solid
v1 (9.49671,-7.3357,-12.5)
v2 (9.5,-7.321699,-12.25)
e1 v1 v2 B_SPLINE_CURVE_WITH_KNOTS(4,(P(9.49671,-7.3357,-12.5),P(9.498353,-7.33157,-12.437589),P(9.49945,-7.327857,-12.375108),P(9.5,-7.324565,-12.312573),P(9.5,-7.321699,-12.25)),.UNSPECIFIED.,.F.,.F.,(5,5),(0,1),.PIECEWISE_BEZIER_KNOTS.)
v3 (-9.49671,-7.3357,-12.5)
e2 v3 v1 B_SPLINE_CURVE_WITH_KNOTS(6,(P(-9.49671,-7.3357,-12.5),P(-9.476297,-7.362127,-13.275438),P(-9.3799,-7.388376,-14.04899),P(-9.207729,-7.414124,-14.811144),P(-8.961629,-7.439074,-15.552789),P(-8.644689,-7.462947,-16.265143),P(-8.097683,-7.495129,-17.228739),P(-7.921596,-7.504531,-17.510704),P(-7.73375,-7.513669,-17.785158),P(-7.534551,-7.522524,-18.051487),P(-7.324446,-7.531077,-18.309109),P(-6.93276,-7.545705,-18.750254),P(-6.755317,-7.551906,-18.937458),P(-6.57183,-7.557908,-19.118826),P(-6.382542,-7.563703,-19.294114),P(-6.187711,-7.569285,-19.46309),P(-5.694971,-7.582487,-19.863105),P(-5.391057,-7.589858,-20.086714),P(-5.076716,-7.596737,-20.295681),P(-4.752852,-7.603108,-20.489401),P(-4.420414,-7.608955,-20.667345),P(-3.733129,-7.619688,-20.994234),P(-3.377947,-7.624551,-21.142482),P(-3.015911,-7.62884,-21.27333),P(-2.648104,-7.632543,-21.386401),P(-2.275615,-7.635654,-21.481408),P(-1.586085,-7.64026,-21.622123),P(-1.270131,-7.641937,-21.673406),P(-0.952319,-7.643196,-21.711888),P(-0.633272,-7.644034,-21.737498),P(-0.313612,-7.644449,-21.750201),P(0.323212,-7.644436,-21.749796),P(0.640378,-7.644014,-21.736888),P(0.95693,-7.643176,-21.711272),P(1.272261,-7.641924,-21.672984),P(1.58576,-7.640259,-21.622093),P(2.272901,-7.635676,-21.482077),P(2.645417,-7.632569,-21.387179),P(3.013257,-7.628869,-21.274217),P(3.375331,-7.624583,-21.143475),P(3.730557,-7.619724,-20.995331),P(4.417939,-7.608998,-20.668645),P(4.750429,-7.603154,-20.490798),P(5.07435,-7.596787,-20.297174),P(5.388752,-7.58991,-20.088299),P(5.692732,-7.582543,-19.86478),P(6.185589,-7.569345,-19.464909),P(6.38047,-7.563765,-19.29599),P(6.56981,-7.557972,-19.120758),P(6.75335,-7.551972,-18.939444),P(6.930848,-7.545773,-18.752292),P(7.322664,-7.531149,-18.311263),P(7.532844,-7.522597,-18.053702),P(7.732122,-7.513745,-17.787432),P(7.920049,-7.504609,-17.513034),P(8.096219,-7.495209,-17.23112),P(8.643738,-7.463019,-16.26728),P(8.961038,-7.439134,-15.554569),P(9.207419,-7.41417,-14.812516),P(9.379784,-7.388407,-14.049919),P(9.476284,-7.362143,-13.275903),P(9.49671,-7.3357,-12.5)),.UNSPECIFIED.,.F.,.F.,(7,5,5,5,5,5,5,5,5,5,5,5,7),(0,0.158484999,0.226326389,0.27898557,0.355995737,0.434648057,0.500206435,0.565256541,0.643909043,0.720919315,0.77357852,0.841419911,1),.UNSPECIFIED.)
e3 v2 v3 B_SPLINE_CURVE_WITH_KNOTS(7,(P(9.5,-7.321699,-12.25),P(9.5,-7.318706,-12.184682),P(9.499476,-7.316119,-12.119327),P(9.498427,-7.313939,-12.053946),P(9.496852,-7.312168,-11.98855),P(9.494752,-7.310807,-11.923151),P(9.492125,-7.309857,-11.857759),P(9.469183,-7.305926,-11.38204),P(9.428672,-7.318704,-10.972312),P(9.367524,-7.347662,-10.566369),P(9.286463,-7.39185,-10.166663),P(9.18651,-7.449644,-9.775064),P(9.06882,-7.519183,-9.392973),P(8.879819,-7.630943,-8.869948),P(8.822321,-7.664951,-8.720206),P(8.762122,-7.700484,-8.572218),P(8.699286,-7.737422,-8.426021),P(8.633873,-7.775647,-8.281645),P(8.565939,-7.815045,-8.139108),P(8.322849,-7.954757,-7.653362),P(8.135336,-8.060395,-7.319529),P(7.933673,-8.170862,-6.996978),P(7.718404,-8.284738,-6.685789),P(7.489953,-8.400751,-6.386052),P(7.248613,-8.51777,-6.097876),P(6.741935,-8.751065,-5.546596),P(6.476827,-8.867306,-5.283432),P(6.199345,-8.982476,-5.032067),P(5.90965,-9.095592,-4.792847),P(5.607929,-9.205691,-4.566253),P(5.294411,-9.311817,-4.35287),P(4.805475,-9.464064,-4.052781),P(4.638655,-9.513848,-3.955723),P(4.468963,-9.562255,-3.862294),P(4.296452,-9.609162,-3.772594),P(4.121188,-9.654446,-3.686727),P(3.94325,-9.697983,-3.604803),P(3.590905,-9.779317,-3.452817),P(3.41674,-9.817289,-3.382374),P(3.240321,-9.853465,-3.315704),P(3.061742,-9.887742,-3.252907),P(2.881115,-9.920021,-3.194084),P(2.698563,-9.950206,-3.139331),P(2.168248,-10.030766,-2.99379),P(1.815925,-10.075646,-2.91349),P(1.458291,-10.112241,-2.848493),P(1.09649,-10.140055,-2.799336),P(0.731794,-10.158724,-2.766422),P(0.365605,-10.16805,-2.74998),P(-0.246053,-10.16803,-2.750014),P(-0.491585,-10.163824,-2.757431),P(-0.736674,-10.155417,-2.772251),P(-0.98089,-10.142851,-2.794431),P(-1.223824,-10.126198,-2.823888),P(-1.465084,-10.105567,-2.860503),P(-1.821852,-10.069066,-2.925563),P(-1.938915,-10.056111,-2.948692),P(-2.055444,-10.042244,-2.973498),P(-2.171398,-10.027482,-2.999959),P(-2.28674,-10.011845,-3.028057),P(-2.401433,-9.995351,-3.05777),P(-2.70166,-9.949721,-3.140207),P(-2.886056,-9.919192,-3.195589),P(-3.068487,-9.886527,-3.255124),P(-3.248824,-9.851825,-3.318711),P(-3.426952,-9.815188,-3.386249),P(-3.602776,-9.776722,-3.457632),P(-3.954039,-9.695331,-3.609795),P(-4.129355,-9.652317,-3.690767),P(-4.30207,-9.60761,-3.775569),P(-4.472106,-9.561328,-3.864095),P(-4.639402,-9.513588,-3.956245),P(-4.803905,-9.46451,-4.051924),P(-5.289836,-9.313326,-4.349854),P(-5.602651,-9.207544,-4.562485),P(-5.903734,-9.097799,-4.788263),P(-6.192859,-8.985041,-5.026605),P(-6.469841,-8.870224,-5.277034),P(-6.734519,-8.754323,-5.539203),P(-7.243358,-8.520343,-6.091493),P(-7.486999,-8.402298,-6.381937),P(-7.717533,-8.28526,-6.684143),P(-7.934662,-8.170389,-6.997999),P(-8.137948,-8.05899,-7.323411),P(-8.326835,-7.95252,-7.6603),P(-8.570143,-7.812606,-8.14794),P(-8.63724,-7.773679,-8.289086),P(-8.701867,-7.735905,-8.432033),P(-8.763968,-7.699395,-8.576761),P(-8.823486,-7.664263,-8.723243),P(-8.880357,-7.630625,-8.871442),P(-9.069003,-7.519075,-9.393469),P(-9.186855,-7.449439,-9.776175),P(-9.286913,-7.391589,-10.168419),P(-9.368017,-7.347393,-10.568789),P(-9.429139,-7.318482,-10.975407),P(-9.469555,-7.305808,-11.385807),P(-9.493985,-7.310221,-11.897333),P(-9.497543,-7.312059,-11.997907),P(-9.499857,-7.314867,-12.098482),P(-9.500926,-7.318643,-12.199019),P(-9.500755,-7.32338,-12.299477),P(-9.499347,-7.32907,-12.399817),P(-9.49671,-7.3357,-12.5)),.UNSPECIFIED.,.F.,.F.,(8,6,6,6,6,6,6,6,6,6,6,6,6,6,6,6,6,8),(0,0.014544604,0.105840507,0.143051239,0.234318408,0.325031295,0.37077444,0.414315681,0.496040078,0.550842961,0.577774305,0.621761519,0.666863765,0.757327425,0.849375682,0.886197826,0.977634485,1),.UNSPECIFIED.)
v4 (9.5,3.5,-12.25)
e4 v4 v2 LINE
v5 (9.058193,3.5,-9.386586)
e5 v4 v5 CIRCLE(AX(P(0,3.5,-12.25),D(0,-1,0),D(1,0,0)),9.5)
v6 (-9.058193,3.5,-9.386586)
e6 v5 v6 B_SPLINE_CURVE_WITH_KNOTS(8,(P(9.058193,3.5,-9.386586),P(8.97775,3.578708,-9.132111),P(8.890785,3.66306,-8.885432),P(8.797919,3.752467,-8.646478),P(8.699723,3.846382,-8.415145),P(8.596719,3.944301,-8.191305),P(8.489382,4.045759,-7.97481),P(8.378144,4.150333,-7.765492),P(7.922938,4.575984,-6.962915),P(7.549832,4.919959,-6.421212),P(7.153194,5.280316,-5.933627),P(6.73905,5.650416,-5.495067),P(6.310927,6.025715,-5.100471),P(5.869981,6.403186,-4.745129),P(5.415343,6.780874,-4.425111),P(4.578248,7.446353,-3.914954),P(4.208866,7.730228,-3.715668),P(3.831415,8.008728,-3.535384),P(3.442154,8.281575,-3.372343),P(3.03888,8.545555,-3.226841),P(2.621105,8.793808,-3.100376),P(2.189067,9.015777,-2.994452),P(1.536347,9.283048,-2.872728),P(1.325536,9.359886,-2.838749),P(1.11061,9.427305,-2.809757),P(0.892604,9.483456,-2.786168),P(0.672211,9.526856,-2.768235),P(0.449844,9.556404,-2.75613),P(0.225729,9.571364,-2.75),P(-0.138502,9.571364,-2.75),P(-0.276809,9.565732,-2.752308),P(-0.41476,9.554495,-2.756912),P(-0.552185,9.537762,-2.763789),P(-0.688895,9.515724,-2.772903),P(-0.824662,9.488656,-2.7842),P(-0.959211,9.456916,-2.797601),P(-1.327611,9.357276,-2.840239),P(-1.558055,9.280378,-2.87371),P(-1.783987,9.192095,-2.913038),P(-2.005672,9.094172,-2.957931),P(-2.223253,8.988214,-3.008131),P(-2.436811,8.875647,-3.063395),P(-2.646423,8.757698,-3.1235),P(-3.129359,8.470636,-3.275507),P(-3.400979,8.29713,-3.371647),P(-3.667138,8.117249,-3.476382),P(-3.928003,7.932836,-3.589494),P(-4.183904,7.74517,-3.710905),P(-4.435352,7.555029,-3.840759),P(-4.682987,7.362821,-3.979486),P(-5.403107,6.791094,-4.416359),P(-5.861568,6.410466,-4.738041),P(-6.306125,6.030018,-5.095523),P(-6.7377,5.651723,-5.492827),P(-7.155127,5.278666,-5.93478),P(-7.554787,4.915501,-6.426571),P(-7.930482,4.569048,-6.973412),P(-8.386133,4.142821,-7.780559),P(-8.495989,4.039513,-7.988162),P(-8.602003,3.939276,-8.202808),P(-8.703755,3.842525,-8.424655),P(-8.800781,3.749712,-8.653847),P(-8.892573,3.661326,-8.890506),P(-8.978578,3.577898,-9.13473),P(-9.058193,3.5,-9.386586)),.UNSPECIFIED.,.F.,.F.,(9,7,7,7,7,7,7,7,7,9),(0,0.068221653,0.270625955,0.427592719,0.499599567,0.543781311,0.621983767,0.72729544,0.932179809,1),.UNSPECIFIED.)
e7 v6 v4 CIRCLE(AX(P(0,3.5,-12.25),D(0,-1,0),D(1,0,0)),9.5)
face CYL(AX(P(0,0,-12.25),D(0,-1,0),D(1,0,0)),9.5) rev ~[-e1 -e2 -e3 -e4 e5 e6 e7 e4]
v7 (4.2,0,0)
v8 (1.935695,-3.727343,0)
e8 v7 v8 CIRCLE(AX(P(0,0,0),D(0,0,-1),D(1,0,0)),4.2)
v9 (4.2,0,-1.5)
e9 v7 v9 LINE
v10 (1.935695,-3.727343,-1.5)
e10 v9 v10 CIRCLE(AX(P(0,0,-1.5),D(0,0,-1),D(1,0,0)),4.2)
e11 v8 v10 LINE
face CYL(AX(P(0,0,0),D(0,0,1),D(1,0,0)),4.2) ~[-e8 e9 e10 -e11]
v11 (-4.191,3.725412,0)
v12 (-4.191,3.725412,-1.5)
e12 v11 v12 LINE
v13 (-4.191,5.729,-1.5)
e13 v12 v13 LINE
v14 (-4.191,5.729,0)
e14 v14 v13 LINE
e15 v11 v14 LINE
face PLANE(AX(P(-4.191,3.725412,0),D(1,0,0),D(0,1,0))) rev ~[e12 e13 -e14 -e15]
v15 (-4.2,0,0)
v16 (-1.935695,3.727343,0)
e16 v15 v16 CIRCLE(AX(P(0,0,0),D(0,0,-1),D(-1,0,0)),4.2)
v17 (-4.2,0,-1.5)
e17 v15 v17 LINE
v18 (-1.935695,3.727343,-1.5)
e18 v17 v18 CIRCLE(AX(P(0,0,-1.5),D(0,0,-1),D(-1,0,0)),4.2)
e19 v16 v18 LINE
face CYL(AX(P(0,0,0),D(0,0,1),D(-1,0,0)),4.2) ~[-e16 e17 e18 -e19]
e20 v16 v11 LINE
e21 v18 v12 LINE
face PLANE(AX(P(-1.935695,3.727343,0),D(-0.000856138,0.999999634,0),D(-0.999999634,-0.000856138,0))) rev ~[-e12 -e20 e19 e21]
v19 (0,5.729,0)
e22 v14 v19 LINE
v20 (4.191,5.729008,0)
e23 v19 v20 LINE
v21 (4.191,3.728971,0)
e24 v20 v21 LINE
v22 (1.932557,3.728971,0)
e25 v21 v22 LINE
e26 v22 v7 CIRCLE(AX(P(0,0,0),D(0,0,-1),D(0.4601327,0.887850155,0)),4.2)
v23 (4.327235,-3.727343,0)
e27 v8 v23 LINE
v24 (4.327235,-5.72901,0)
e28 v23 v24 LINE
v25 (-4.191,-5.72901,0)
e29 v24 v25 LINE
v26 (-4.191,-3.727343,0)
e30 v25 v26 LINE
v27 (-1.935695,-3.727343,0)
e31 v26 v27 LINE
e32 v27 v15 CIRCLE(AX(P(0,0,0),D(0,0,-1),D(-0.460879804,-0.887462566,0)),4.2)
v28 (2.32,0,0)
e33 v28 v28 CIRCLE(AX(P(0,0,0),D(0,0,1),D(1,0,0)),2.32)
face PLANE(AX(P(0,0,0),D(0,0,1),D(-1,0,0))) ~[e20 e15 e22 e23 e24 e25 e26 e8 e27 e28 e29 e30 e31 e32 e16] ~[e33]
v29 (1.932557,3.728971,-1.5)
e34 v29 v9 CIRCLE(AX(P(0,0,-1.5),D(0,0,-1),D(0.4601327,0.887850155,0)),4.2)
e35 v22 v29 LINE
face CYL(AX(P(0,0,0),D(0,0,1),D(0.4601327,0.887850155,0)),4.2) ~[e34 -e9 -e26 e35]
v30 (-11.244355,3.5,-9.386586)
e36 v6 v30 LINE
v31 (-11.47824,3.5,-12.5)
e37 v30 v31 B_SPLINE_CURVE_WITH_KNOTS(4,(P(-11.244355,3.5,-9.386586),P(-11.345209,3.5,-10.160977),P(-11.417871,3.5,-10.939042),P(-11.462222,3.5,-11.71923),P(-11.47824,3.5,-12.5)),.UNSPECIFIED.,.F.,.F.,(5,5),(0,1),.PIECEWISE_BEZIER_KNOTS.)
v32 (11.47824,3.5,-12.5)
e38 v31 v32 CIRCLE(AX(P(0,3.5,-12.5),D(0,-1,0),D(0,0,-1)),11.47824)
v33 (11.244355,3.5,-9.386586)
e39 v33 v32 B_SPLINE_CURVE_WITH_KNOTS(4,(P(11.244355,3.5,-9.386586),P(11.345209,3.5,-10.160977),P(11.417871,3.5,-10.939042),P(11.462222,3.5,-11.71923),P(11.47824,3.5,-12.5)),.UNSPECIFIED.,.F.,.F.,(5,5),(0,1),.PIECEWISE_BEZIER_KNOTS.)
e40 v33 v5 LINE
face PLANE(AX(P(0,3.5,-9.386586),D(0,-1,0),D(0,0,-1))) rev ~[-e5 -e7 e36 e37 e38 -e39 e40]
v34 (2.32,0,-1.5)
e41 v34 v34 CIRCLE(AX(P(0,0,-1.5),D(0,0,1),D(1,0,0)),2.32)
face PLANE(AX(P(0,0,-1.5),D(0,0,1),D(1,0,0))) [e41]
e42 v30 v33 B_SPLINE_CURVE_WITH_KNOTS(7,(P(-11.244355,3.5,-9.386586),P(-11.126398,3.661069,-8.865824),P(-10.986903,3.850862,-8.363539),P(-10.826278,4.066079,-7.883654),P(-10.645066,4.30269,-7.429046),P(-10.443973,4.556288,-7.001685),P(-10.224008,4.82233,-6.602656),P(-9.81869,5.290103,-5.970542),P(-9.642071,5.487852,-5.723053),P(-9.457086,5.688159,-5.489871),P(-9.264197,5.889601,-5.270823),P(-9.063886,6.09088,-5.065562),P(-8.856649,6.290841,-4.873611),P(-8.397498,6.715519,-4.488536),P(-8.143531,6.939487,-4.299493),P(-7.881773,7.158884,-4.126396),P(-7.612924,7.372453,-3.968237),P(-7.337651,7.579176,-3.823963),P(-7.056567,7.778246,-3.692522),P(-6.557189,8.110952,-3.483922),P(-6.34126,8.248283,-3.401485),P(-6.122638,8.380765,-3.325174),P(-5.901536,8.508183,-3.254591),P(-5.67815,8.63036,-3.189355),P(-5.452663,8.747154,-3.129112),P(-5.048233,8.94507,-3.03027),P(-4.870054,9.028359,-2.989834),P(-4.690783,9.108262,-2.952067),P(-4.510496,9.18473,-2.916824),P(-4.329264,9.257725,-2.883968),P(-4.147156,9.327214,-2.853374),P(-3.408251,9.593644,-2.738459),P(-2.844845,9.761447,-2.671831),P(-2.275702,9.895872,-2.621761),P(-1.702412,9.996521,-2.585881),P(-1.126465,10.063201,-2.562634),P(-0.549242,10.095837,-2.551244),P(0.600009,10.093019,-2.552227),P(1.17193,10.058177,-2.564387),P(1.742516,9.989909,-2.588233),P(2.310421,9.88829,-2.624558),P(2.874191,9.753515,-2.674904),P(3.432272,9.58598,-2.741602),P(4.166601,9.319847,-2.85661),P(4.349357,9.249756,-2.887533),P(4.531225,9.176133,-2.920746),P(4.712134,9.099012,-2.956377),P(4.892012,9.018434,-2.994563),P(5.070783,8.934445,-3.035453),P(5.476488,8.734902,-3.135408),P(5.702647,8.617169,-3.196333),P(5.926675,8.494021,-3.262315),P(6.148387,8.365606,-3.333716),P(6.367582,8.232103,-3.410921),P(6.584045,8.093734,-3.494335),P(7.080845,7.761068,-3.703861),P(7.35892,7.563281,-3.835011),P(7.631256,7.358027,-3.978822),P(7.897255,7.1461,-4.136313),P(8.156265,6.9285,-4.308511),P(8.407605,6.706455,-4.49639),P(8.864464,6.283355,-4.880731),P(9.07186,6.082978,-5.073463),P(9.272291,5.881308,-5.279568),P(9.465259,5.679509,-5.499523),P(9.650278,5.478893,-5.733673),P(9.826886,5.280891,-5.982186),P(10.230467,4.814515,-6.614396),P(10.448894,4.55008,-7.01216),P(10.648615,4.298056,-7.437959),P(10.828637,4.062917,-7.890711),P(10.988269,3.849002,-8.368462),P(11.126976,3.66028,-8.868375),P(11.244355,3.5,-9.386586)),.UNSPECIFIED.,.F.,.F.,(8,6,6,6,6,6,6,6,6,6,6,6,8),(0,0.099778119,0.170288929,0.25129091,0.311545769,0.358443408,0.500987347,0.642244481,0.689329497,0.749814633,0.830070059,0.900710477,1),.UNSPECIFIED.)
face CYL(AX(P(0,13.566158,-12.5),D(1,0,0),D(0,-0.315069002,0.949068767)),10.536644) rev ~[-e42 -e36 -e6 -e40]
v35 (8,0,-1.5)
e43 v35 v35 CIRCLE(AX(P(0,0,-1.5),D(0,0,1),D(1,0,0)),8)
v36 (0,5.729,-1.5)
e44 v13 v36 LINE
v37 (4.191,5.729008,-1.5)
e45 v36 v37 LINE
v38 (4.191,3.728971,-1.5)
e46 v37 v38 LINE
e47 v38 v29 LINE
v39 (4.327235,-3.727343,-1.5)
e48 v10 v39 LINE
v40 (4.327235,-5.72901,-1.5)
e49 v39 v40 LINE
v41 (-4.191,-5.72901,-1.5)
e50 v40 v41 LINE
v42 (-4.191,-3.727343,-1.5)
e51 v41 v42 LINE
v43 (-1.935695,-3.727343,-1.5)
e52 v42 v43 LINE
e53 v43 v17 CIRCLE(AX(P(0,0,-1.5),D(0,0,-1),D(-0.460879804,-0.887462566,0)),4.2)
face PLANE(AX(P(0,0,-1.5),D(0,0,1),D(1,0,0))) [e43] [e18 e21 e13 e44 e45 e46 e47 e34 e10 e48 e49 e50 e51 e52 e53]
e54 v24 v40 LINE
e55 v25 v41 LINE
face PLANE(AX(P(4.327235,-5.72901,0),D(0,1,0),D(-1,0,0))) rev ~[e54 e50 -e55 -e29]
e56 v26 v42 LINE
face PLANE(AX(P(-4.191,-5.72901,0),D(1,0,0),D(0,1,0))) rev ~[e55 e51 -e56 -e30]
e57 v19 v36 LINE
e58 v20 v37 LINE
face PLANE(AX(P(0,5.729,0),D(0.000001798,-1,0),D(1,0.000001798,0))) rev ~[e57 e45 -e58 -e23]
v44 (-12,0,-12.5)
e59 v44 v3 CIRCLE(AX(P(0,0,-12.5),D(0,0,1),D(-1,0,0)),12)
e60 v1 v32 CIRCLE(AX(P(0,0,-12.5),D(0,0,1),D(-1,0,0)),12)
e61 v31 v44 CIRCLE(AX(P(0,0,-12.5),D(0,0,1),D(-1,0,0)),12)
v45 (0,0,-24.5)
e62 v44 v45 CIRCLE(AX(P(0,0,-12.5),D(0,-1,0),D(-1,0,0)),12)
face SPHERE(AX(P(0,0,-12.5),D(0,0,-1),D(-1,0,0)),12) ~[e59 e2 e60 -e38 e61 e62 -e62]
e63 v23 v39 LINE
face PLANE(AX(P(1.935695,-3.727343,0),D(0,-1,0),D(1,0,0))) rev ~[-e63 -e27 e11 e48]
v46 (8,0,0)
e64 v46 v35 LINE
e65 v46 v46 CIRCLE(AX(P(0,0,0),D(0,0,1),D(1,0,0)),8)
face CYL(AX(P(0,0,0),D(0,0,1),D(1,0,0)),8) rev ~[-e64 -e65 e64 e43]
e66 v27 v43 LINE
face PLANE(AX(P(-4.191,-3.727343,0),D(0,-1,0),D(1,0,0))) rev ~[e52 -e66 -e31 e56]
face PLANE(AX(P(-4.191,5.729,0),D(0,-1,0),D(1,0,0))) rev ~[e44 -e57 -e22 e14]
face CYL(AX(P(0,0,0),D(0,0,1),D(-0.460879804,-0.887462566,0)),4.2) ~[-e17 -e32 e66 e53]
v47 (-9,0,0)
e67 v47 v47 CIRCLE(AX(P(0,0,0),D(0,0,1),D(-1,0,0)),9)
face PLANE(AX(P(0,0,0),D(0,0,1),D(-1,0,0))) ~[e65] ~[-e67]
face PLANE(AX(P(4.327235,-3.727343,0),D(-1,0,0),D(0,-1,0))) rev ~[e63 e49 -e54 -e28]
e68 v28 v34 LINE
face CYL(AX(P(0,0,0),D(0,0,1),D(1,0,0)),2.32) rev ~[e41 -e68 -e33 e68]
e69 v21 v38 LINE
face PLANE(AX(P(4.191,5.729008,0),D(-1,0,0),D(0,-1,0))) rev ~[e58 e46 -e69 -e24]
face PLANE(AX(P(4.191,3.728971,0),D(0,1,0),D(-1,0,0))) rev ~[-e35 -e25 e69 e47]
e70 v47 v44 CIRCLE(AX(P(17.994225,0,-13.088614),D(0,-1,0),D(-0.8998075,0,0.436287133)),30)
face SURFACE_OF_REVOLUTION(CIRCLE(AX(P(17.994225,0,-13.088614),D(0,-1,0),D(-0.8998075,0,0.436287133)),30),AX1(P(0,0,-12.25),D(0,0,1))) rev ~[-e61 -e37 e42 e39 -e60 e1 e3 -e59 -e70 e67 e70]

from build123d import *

# Parameters (mm, degrees)
F2_R     = 9.5
F3_DEPTH = 12.7
F4_R     = 8
F5_DEPTH = 1.5
F7_DEPTH = 12.7


# Not quite as in the source:
# - ends of sketch curves that miss each other by under 0.0002 mm in the source are joined
# - a feature names something its author has since deleted; it is built from what else it names


with BuildPart() as f1:
    # F0 (on Front) → F1 (revolve)
    with BuildSketch(Plane.XZ):
        with BuildLine():
            ThreePointArc((-12, -12.5), (-8.4852813742, -20.9852813742), (0, -24.5))
            Line((0, -24.5), (0, -12.5))
            Line((0, -12.5), (-12, -12.5))
        make_face()
        with BuildLine():
            Line((-12, -12.5), (0, -12.5))
            Line((0, -12.5), (0, 0))
            Line((0, 0), (-9, 0))
            ThreePointArc((-9, 0), (-11.177394056, -6.0874254266), (-12, -12.5))
        make_face()
    revolve(axis=Axis((0, 0, -12.25), (0, 0, 1)))

    # F2 (on Front) → F3 (cut, symmetric)
    with BuildSketch(Plane.XZ):
        with Locations((0, -12.25)):
            Circle(F2_R)
    extrude(amount=F3_DEPTH, both=True, mode=Mode.SUBTRACT)

    # F4 (on Top) → F5 (cut)
    with BuildSketch(Plane.XY):
        Circle(F4_R)
        with BuildLine():
            ThreePointArc((-1.9356951783, -3.7273427769), (-3.58956263, -2.1806054493), (-4.2, 0))
            ThreePointArc((-4.2, 0), (-3.58956263, 2.1806054493), (-1.9356951783, 3.7273427769))
            Line((-1.9356951783, 3.7273427769), (-4.191, 3.7254119238))
            Line((-4.191, 3.7254119238), (-4.191, 5.729))
            Line((-4.191, 5.729), (0, 5.729))
            Line((0, 5.729), (4.191, 5.7290075347))
            Line((4.191, 5.7290075347), (4.191, 3.7289706524))
            Line((4.191, 3.7289706524), (1.9325573402, 3.7289706524))
            ThreePointArc((1.9325573402, 3.7289706524), (3.5886446487, 2.1821158506), (4.2, 0))
            ThreePointArc((4.2, 0), (3.58956263, -2.1806054493), (1.9356951783, -3.7273427769))
            Line((1.9356951783, -3.7273427769), (4.3272348121, -3.7273427769))
            Line((4.3272348121, -3.7273427769), (4.3272348121, -5.7290102))
            Line((4.3272348121, -5.7290102), (0, -5.7290102))
            Line((0, -5.7290102), (-4.191, -5.7290102))
            Line((-4.191, -5.7290102), (-4.191, -3.7273427769))
            Line((-4.191, -3.7273427769), (-1.9356951783, -3.7273427769))
        make_face(mode=Mode.SUBTRACT)
        with BuildLine():
            ThreePointArc((-2.32, 0), (0, -2.32), (2.32, 0))
            ThreePointArc((2.32, 0), (0, 2.32), (-2.32, 0))
        make_face()
    extrude(amount=-F5_DEPTH, mode=Mode.SUBTRACT)

    # F6 (on Right) → F7 (cut, symmetric)
    with BuildSketch(Plane.YZ):
        with BuildLine():
            Line((3.5, -9.3865861699), (3.5, -26.5))
            Line((3.5, -26.5), (11.7441575179, -26.5))
            Line((11.7441575179, -26.5), (11.7441575179, -12.5))
            Line((11.7441575179, -12.5), (11.7441575179, -2.5))
            Line((11.7441575179, -2.5), (10.2463875179, -2.5))
            ThreePointArc((10.2463875179, -2.5), (6.0394031611, -5.1264769814), (3.5, -9.3865861699))
        make_face()
    extrude(amount=F7_DEPTH, both=True, mode=Mode.SUBTRACT)


solid = f1.part
